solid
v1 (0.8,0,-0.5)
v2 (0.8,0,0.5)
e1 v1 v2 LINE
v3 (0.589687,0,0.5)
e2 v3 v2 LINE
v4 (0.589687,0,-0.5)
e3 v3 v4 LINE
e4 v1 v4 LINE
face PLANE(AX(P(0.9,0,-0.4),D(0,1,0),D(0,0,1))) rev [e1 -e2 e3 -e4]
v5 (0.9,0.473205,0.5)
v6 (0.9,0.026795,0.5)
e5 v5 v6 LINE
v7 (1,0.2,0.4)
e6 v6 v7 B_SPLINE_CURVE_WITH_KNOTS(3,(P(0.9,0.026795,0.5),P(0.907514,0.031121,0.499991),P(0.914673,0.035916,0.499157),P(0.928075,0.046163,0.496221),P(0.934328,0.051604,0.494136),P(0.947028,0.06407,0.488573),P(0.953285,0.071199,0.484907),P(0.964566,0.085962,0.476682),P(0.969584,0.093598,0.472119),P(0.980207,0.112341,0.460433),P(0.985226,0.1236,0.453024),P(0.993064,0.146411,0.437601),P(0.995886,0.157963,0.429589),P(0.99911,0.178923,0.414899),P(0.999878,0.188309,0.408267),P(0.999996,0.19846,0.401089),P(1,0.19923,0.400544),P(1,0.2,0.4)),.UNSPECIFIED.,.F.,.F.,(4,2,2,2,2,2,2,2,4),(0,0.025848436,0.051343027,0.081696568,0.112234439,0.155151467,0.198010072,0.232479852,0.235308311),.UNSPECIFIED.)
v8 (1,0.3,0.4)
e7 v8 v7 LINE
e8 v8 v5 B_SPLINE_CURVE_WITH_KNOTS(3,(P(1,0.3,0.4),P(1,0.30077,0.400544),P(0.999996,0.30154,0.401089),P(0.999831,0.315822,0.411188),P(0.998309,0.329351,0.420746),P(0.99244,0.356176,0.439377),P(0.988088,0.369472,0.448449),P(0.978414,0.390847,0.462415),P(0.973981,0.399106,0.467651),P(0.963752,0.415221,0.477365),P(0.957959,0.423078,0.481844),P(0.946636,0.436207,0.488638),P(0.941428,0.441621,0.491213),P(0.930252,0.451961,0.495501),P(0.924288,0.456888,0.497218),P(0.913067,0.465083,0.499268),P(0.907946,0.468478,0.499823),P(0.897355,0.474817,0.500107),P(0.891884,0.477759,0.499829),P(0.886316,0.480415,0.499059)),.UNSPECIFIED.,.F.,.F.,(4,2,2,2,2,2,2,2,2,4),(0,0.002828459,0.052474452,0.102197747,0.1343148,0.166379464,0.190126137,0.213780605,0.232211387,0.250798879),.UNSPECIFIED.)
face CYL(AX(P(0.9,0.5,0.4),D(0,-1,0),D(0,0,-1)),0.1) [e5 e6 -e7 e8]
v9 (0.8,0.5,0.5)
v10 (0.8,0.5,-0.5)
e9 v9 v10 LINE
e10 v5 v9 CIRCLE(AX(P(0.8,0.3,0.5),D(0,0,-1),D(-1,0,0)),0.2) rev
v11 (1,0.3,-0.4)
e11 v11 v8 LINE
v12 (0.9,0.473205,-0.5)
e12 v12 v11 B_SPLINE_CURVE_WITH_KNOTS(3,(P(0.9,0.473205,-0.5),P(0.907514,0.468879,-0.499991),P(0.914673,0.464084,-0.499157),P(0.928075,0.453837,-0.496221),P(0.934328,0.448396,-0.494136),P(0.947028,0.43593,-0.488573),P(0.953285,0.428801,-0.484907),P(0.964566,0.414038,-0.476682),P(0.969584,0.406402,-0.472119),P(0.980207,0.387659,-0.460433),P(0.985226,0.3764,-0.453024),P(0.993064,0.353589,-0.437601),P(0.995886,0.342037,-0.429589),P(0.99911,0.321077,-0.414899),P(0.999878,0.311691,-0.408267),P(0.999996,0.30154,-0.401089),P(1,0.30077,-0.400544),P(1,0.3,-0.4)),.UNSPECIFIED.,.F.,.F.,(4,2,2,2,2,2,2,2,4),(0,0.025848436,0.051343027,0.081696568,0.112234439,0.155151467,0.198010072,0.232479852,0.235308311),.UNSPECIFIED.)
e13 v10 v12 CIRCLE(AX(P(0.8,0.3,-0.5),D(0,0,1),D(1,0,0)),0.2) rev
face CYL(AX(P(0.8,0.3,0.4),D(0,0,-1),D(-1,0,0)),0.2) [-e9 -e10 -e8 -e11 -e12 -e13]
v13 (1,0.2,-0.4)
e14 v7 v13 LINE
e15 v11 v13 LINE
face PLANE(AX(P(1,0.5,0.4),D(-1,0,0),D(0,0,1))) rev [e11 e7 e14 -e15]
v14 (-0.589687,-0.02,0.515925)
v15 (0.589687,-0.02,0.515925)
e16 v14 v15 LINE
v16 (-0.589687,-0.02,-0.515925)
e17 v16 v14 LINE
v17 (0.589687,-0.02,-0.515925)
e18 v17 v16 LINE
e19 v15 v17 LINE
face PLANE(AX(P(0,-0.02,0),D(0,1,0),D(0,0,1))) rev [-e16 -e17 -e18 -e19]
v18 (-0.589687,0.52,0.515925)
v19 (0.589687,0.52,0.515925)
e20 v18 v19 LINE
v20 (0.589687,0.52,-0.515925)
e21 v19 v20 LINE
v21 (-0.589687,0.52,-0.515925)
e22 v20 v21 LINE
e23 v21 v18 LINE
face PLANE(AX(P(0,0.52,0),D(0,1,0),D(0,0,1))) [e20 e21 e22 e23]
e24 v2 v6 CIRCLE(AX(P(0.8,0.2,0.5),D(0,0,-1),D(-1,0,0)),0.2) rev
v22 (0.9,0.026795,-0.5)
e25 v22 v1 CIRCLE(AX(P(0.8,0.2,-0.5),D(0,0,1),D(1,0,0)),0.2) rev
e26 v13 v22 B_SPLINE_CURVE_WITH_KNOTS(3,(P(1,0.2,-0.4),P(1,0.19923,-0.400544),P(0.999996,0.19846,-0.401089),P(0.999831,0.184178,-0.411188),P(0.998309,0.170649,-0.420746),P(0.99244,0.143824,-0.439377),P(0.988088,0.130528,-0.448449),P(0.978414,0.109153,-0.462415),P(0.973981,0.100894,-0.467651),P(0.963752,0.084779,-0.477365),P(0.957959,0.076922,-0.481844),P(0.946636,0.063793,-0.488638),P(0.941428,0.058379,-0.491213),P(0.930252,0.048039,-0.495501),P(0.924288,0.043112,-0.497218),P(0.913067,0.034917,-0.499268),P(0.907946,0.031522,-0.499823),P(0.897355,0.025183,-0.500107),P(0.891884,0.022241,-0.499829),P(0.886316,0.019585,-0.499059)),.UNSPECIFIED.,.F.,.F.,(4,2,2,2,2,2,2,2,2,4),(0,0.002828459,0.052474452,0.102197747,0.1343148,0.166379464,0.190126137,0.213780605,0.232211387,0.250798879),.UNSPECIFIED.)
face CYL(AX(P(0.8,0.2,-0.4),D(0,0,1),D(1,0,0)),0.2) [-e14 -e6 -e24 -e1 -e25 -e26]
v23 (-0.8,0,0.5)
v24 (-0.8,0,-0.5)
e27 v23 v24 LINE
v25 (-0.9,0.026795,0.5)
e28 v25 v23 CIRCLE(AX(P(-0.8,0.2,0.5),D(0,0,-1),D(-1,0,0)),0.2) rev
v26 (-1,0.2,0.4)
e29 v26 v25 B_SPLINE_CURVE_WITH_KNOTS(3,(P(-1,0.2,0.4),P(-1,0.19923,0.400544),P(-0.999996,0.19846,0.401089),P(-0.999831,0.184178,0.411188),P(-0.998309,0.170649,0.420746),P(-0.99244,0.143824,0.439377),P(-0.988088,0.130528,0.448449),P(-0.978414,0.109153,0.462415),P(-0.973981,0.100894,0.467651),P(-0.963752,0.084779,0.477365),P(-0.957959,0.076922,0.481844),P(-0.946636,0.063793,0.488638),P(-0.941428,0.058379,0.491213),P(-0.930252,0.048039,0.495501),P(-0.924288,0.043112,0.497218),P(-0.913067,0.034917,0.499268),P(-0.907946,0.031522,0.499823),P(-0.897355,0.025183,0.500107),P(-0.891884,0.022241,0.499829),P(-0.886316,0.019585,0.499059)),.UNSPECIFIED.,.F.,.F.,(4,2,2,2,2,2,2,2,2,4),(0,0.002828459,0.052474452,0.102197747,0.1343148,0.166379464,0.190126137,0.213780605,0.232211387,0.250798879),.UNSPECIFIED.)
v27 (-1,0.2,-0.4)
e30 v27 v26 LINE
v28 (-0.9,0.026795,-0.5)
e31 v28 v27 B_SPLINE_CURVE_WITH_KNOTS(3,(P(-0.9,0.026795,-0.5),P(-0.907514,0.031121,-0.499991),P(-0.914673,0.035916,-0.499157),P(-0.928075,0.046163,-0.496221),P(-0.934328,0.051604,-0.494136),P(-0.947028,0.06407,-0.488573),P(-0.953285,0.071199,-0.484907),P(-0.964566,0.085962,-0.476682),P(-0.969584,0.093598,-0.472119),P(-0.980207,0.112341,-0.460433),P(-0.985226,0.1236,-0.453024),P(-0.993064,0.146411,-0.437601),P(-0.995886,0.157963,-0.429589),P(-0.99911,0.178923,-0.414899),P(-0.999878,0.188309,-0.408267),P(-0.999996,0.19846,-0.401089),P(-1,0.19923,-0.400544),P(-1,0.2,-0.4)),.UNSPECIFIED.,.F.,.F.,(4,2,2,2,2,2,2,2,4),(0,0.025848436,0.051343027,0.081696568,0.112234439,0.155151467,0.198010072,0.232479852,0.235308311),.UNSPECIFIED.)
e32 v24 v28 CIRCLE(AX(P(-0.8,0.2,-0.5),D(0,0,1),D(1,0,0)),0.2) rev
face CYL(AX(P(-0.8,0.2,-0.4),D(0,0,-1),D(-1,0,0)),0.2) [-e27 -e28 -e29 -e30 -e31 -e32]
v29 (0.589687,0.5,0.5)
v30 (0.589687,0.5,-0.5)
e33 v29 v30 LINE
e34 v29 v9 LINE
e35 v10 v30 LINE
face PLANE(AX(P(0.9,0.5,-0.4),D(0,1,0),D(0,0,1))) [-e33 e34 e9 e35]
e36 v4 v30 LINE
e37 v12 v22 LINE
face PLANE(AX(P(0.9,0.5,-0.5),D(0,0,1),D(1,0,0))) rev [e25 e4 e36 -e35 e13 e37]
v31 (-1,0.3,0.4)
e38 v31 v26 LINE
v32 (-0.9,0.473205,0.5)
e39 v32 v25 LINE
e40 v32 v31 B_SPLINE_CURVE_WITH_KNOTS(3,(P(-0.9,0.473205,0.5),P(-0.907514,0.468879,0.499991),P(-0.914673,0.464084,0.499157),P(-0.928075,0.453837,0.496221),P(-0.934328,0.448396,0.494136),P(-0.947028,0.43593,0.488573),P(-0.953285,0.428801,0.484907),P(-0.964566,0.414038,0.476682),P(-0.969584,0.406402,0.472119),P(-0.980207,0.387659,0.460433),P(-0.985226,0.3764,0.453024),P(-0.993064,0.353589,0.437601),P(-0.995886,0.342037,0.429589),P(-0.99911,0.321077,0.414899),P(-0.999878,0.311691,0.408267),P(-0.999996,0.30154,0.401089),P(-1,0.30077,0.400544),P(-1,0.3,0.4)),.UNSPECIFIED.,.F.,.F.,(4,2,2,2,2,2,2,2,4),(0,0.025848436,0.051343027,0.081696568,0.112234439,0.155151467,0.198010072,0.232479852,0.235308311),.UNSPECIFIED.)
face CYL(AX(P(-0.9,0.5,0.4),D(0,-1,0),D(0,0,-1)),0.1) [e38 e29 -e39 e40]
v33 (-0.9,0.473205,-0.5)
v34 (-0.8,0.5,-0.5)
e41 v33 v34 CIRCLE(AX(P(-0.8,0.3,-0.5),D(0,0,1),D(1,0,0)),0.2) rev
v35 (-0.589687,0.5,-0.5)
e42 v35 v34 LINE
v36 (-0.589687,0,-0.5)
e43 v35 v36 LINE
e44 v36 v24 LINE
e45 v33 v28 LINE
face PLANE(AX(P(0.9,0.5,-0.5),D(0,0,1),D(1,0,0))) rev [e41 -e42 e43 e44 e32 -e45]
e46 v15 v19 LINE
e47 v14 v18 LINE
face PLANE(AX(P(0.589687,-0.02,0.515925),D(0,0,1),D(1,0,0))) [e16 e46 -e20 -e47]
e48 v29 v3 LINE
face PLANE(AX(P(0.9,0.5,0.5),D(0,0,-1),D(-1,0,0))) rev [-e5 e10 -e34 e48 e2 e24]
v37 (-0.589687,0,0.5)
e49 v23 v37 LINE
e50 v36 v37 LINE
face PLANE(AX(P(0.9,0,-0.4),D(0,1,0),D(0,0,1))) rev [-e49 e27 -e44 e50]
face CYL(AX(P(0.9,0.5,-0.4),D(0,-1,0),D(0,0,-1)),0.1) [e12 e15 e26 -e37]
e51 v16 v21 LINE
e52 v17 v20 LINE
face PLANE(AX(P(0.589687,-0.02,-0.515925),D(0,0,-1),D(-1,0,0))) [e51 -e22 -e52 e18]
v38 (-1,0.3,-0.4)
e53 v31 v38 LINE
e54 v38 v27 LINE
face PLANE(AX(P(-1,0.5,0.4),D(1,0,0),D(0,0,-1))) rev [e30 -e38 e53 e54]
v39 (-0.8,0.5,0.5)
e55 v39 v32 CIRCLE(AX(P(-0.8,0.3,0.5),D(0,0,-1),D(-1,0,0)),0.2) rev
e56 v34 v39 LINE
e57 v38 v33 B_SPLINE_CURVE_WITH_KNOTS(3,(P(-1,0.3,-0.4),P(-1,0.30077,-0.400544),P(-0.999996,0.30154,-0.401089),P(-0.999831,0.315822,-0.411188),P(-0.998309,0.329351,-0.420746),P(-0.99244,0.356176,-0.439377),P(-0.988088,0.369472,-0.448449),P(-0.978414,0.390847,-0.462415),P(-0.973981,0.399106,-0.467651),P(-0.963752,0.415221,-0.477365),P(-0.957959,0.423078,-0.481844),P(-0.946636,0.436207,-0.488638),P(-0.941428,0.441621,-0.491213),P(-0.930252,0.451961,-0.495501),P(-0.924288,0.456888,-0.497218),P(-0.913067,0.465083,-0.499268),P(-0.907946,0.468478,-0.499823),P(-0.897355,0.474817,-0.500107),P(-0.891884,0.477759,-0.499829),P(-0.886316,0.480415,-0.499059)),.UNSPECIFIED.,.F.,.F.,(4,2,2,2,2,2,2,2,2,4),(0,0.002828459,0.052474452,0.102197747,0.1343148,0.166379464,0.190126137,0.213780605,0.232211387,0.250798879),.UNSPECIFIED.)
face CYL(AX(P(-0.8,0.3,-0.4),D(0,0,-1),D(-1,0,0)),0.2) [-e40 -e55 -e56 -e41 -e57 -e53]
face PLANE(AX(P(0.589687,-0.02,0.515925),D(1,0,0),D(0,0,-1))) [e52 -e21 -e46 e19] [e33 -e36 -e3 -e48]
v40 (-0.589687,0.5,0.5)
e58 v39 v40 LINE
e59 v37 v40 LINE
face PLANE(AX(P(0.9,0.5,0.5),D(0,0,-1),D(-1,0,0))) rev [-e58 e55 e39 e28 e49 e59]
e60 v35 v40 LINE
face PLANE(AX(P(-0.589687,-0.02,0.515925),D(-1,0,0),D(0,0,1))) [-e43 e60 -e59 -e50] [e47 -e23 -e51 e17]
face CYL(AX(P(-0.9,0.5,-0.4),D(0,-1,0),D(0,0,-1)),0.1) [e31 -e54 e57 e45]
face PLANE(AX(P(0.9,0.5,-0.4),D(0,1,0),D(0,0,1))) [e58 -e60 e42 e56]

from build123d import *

# Parameters (mm, degrees)
BOSS_EXTRU_1_DEPTH      = 0.5
BOSS_EXTRU_2_DEPTH      = 0.02
BOSS_EXTRU_2_DEPTH_BACK = 0.52
ESQUISSE2_W             = 1.179373422
ESQUISSE2_H             = 1.03185074
CONG_2_R                = 0.2
CONG_3_R                = 0.2
CONG_4_R                = 0.2
CONG_5_R                = 0.2


with BuildPart() as part:
    # Esquisse1 → Boss.-Extru.1 (new body)
    with BuildSketch(Plane(origin=(0, 0, 0), x_dir=(1, 0, 0), z_dir=(0, 1, 0))):
        with BuildLine():
            Line((0.9, -0.5), (-0.9, -0.5))
            ThreePointArc((-0.9, -0.5), (-0.970710678, -0.470710678), (-1, -0.4))
            Line((-1, -0.4), (-1, 0.4))
            ThreePointArc((-1, 0.4), (-0.970710678, 0.470710678), (-0.9, 0.5))
            Line((-0.9, 0.5), (0.9, 0.5))
            ThreePointArc((0.9, 0.5), (0.970710678, 0.470710678), (1, 0.4))
            Line((1, 0.4), (1, -0.4))
            ThreePointArc((1, -0.4), (0.970710678, -0.470710678), (0.9, -0.5))
        make_face()
    extrude(amount=BOSS_EXTRU_1_DEPTH)

    # Esquisse2 → Boss.-Extru.2 (add, two sides: drawn at the far end of the back side and taken through both)
    with BuildSketch(Plane(origin=(0, 0.5, 0), x_dir=(1, 0, 0), z_dir=(0, 1, 0)).offset(-BOSS_EXTRU_2_DEPTH_BACK)):
        Rectangle(ESQUISSE2_W, ESQUISSE2_H)
    extrude(amount=BOSS_EXTRU_2_DEPTH + BOSS_EXTRU_2_DEPTH_BACK)

    # Congé2
    # the kernel refuses this fillet: 0.2 mm, written as the material it takes off along each edge
    with BuildSketch(Plane(origin=(-1, 0, 0.9), x_dir=(1, 0, 0), z_dir=(0, 0, -1))) as cong_2_piece_1:
        with BuildLine():
            CenterArc((CONG_2_R, -CONG_2_R), CONG_2_R, 90, 90)
            Line((0, -CONG_2_R), (0, 0))
            Line((0, 0), (CONG_2_R, 0))
        make_face()
    extrude(amount=1.8, mode=Mode.SUBTRACT)

    # Congé3
    # the kernel refuses this fillet: 0.2 mm, written as the material it takes off along each edge
    with BuildSketch(Plane(origin=(-1, 0.5, 0.9), x_dir=(1, 0, 0), z_dir=(0, 0, -1))) as cong_3_piece_1:
        with BuildLine():
            CenterArc((CONG_3_R, CONG_3_R), CONG_3_R, 180, 90)
            Line((0, CONG_3_R), (0, 0))
            Line((0, 0), (CONG_3_R, 0))
        make_face()
    extrude(amount=1.8, mode=Mode.SUBTRACT)

    # Congé4
    # the kernel refuses this fillet: 0.2 mm, written as the material it takes off along each edge
    with BuildSketch(Plane(origin=(1, 0.5, -0.9), x_dir=(-1, 0, 0), z_dir=(0, 0, 1))) as cong_4_piece_1:
        with BuildLine():
            CenterArc((CONG_4_R, CONG_4_R), CONG_4_R, 180, 90)
            Line((0, CONG_4_R), (0, 0))
            Line((0, 0), (CONG_4_R, 0))
        make_face()
    extrude(amount=1.8, mode=Mode.SUBTRACT)

    # Congé5
    # the kernel refuses this fillet: 0.2 mm, written as the material it takes off along each edge
    with BuildSketch(Plane(origin=(1, 0, -0.9), x_dir=(-1, 0, 0), z_dir=(0, 0, 1))) as cong_5_piece_1:
        with BuildLine():
            CenterArc((CONG_5_R, -CONG_5_R), CONG_5_R, 90, 90)
            Line((0, -CONG_5_R), (0, 0))
            Line((0, 0), (CONG_5_R, 0))
        make_face()
    extrude(amount=1.8, mode=Mode.SUBTRACT)


solid = part.part
